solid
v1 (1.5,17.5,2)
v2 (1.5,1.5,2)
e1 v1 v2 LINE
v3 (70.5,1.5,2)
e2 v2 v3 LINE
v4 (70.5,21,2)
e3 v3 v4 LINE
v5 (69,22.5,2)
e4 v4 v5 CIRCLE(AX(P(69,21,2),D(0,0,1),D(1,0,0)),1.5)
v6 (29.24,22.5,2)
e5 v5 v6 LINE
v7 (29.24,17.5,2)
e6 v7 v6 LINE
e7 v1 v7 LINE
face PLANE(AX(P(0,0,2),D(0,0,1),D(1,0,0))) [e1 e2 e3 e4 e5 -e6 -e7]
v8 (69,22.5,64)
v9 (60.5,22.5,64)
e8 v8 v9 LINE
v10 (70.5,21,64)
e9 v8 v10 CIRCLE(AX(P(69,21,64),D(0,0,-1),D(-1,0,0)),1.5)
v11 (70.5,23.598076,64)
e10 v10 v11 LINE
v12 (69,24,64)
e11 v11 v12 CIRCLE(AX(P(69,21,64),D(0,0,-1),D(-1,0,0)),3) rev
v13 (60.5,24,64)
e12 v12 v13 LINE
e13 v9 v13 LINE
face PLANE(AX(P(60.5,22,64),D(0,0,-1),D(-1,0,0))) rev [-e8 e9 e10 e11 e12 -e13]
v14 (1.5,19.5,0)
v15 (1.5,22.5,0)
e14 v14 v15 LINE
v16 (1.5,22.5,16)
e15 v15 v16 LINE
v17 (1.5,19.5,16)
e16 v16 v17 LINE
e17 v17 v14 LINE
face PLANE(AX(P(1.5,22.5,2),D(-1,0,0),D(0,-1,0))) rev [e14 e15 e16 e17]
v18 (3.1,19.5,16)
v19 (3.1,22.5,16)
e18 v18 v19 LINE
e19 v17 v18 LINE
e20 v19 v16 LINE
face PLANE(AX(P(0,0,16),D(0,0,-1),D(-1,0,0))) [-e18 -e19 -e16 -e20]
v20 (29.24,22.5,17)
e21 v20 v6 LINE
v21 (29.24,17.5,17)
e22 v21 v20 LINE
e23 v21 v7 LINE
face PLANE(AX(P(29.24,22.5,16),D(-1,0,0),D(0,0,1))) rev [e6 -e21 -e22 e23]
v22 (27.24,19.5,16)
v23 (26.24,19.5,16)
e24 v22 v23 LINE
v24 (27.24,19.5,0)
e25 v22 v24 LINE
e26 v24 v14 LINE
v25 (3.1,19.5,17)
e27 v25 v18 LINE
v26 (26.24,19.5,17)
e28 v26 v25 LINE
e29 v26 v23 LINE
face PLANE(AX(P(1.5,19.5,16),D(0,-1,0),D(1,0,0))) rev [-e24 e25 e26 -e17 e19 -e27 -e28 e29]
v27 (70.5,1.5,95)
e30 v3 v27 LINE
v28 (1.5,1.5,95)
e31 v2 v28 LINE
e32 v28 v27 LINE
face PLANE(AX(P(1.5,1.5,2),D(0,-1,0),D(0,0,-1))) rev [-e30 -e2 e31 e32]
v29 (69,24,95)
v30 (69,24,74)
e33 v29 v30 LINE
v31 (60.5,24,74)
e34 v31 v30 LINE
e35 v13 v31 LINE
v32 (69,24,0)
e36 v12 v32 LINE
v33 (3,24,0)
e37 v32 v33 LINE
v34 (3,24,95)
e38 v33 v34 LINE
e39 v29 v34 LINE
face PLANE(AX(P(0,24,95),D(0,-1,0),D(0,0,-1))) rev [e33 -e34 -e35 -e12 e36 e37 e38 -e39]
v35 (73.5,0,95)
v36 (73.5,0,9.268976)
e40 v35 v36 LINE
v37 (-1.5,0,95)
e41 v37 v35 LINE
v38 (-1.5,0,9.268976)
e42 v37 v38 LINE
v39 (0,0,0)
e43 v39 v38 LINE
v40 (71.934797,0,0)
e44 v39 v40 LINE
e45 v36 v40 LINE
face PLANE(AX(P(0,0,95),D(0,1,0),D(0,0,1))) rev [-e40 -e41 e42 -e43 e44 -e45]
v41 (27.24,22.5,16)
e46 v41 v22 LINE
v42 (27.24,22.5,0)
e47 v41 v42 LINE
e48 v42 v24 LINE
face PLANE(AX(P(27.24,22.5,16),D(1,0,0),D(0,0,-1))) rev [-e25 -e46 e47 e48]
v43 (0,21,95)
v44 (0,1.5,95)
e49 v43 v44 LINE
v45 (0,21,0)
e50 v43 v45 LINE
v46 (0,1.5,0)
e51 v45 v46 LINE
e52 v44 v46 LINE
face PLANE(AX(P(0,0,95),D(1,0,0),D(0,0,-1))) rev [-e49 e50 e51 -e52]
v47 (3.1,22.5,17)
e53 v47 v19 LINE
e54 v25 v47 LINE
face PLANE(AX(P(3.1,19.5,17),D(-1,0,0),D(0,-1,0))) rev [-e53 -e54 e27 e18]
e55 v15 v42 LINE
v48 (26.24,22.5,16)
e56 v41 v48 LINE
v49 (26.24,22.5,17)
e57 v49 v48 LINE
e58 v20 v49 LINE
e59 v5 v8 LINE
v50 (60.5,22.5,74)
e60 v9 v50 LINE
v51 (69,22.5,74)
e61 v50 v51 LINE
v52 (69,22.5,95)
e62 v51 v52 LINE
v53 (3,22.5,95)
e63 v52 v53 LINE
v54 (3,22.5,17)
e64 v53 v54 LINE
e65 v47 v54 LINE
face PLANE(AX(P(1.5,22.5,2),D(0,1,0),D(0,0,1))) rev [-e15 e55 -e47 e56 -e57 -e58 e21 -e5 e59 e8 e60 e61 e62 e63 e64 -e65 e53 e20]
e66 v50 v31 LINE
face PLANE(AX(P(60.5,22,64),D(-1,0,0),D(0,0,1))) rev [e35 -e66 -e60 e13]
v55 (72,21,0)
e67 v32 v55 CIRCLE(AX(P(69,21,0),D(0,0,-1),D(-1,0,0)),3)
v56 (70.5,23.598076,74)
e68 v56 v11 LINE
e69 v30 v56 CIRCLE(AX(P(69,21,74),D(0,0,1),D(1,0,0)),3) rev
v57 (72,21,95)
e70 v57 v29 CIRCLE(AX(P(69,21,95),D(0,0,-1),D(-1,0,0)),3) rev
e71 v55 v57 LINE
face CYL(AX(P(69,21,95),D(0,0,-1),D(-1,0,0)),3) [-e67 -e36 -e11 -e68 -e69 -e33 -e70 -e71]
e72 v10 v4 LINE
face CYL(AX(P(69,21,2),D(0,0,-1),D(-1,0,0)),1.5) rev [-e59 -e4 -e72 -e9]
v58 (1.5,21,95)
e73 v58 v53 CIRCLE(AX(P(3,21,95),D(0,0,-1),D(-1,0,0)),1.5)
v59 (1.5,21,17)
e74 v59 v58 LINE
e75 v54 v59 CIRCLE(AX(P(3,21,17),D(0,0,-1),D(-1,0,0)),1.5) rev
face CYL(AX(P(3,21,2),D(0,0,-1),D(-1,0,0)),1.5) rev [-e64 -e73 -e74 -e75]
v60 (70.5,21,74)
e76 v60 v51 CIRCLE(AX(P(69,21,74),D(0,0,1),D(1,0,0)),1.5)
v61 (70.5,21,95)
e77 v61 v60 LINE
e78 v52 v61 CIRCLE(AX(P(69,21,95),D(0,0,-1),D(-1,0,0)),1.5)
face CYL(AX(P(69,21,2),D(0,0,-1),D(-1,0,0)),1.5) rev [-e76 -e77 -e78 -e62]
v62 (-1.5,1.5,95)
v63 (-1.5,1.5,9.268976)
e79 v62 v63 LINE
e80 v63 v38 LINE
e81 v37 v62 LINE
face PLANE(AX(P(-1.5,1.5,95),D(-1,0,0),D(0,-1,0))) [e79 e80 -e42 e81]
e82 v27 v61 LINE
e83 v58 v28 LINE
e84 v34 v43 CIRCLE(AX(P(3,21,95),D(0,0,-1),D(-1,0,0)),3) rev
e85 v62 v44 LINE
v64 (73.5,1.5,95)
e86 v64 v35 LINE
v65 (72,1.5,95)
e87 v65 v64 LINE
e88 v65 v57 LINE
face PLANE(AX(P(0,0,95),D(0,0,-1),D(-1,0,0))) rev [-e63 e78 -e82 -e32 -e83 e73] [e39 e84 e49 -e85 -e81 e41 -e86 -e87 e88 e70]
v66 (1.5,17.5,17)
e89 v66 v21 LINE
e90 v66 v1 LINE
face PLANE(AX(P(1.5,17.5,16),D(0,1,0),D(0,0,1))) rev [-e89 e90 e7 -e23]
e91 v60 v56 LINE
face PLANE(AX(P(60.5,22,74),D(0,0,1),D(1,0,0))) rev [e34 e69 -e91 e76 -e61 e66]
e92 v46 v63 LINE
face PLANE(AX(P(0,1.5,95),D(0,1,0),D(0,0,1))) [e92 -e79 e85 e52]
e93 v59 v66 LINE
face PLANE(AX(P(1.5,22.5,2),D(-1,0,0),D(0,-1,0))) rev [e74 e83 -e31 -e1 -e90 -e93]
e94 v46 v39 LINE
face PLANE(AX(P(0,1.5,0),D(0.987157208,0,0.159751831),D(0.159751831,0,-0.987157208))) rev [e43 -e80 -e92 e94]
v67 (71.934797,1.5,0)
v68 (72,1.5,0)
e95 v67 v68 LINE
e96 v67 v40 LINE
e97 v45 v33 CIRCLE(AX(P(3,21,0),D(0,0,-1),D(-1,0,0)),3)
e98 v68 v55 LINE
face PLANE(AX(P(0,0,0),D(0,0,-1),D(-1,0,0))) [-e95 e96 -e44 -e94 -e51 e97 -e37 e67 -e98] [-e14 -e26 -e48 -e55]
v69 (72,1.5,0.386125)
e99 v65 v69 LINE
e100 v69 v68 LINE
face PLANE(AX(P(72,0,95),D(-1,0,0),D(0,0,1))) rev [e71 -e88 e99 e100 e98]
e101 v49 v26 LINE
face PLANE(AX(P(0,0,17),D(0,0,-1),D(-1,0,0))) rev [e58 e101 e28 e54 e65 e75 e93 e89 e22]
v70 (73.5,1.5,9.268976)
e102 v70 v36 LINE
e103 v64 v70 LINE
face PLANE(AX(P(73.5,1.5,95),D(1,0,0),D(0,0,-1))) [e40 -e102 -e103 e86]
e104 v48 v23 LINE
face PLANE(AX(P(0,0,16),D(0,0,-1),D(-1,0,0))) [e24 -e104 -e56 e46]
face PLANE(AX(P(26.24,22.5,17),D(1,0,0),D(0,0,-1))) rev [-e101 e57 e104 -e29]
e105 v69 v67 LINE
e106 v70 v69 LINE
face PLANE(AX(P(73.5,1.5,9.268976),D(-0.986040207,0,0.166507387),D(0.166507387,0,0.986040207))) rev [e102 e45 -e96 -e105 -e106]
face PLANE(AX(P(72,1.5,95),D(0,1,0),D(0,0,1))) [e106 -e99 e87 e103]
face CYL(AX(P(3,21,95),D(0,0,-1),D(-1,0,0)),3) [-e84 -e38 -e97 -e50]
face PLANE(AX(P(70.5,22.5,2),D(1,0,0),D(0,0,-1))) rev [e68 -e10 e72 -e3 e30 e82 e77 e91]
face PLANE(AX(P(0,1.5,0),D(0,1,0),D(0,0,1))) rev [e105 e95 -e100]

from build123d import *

# Parameters (mm, degrees)
SKETCH1_W           = 72
SKETCH1_H           = 24
BOSS_EXTRUDE1_DEPTH = 95
SKETCH2_W           = 69
SKETCH2_H           = 21
CUT_EXTRUDE1_DEPTH  = 93
SKETCH3_W           = 10
SKETCH3_H           = 10
CUT_EXTRUDE2_DEPTH  = 2
SKETCH4_W           = 27.74
SKETCH4_H           = 5
BOSS_EXTRUDE2_DEPTH = 14
SKETCH5_W           = 25.74
SKETCH5_H           = 3
CUT_EXTRUDE3_DEPTH  = 16
SKETCH6_W           = 1.5
SKETCH6_H           = 1.5
BOSS_EXTRUDE4_DEPTH = 95
FILLET1_R           = 3
BOSS_EXTRUDE5_DEPTH = 1
FILLET2_R           = 1.5
CUT_EXTRUDE4_DEPTH  = 1.5


with BuildPart() as part:
    # Sketch1 → Boss-Extrude1 (new body)
    with BuildSketch(Plane.XY):
        with Locations((36, 12)):
            Rectangle(SKETCH1_W, SKETCH1_H)
    extrude(amount=BOSS_EXTRUDE1_DEPTH)

    # Sketch2 → Cut-Extrude1 (cut)
    with BuildSketch(Plane.XY.offset(95)):
        with Locations((36, 12)):
            Rectangle(SKETCH2_W, SKETCH2_H)
    extrude(amount=-CUT_EXTRUDE1_DEPTH, mode=Mode.SUBTRACT)

    # Sketch3 → Cut-Extrude2 (cut)
    with BuildSketch(Plane(origin=(0, 24, 0), x_dir=(1, 0, 0), z_dir=(0, 1, 0))):
        with Locations((65.5, -69)):
            Rectangle(SKETCH3_W, SKETCH3_H)
    extrude(amount=-CUT_EXTRUDE2_DEPTH, mode=Mode.SUBTRACT)

    # Sketch4 → Boss-Extrude2 (add)
    with BuildSketch(Plane.XY.offset(2)):
        with Locations((15.37, 20)):
            Rectangle(SKETCH4_W, SKETCH4_H)
    extrude(amount=BOSS_EXTRUDE2_DEPTH)

    # Sketch5 → Cut-Extrude3 (cut)
    with BuildSketch(Plane(origin=(0, 0, 0), x_dir=(-1, 0, 0), z_dir=(0, 0, -1))):
        with Locations((-14.37, 21)):
            Rectangle(SKETCH5_W, SKETCH5_H)
    extrude(amount=-CUT_EXTRUDE3_DEPTH, mode=Mode.SUBTRACT)

    # Sketch6 → Boss-Extrude4 (add)
    with BuildSketch(Plane(origin=(0, 0, 0), x_dir=(-1, 0, 0), z_dir=(0, 0, -1))):
        with Locations((-72.75, 0.75)):
            Rectangle(SKETCH6_W, SKETCH6_H)
        with Locations((0.75, 0.75)):
            Rectangle(SKETCH6_W, SKETCH6_H)
    extrude(amount=-BOSS_EXTRUDE4_DEPTH)

    # Fillet1
    # the kernel refuses this fillet: 3 mm, written as the material it takes off along each edge
    with BuildSketch(Plane(origin=(0, 24, -7.5), x_dir=(1, 0, 0), z_dir=(0, 0, 1)), Plane(origin=(72, 24, -7.5), x_dir=(0, -1, 0), z_dir=(0, 0, 1))) as fillet1_piece_1:
        with BuildLine():
            CenterArc((FILLET1_R, -FILLET1_R), FILLET1_R, 90, 90)
            Line((0, -FILLET1_R), (0, 0))
            Line((0, 0), (FILLET1_R, 0))
        make_face()
    extrude(amount=110, mode=Mode.SUBTRACT)

    # Sketch7 → Boss-Extrude5 (add)
    with BuildSketch(Plane.XY.offset(16)):
        Polygon((29.24, 22.5), (26.24, 22.5), (26.24, 19.5), (3.1, 19.5), (3.1, 22.5), (1.5, 22.5), (1.5, 17.5), (3.1, 17.5), (26.24, 17.5), (29.24, 17.5), align=None)
    extrude(amount=BOSS_EXTRUDE5_DEPTH)

    # Fillet2
    fillet2_edges = [part.edges().sort_by_distance(p)[0] for p in [
        (1.5, 22.5, 56),
        (70.5, 22.5, 33),
        (70.5, 22.5, 84.5),
    ]]
    fillet(fillet2_edges, radius=FILLET2_R)

    # Sketch8 → Cut-Extrude4 (cut)
    with BuildSketch(Plane(origin=(0, 0, 0), x_dir=(-1, 0, 0), z_dir=(0, -1, 0))):
        Polygon((0, 0), (1.5, -9.268975532), (1.5, 0), align=None)
        Polygon((-73.5, -9.268975532), (-71.934797197, 0), (-73.5, 0), align=None)
    extrude(amount=-CUT_EXTRUDE4_DEPTH, mode=Mode.SUBTRACT)


solid = part.part
